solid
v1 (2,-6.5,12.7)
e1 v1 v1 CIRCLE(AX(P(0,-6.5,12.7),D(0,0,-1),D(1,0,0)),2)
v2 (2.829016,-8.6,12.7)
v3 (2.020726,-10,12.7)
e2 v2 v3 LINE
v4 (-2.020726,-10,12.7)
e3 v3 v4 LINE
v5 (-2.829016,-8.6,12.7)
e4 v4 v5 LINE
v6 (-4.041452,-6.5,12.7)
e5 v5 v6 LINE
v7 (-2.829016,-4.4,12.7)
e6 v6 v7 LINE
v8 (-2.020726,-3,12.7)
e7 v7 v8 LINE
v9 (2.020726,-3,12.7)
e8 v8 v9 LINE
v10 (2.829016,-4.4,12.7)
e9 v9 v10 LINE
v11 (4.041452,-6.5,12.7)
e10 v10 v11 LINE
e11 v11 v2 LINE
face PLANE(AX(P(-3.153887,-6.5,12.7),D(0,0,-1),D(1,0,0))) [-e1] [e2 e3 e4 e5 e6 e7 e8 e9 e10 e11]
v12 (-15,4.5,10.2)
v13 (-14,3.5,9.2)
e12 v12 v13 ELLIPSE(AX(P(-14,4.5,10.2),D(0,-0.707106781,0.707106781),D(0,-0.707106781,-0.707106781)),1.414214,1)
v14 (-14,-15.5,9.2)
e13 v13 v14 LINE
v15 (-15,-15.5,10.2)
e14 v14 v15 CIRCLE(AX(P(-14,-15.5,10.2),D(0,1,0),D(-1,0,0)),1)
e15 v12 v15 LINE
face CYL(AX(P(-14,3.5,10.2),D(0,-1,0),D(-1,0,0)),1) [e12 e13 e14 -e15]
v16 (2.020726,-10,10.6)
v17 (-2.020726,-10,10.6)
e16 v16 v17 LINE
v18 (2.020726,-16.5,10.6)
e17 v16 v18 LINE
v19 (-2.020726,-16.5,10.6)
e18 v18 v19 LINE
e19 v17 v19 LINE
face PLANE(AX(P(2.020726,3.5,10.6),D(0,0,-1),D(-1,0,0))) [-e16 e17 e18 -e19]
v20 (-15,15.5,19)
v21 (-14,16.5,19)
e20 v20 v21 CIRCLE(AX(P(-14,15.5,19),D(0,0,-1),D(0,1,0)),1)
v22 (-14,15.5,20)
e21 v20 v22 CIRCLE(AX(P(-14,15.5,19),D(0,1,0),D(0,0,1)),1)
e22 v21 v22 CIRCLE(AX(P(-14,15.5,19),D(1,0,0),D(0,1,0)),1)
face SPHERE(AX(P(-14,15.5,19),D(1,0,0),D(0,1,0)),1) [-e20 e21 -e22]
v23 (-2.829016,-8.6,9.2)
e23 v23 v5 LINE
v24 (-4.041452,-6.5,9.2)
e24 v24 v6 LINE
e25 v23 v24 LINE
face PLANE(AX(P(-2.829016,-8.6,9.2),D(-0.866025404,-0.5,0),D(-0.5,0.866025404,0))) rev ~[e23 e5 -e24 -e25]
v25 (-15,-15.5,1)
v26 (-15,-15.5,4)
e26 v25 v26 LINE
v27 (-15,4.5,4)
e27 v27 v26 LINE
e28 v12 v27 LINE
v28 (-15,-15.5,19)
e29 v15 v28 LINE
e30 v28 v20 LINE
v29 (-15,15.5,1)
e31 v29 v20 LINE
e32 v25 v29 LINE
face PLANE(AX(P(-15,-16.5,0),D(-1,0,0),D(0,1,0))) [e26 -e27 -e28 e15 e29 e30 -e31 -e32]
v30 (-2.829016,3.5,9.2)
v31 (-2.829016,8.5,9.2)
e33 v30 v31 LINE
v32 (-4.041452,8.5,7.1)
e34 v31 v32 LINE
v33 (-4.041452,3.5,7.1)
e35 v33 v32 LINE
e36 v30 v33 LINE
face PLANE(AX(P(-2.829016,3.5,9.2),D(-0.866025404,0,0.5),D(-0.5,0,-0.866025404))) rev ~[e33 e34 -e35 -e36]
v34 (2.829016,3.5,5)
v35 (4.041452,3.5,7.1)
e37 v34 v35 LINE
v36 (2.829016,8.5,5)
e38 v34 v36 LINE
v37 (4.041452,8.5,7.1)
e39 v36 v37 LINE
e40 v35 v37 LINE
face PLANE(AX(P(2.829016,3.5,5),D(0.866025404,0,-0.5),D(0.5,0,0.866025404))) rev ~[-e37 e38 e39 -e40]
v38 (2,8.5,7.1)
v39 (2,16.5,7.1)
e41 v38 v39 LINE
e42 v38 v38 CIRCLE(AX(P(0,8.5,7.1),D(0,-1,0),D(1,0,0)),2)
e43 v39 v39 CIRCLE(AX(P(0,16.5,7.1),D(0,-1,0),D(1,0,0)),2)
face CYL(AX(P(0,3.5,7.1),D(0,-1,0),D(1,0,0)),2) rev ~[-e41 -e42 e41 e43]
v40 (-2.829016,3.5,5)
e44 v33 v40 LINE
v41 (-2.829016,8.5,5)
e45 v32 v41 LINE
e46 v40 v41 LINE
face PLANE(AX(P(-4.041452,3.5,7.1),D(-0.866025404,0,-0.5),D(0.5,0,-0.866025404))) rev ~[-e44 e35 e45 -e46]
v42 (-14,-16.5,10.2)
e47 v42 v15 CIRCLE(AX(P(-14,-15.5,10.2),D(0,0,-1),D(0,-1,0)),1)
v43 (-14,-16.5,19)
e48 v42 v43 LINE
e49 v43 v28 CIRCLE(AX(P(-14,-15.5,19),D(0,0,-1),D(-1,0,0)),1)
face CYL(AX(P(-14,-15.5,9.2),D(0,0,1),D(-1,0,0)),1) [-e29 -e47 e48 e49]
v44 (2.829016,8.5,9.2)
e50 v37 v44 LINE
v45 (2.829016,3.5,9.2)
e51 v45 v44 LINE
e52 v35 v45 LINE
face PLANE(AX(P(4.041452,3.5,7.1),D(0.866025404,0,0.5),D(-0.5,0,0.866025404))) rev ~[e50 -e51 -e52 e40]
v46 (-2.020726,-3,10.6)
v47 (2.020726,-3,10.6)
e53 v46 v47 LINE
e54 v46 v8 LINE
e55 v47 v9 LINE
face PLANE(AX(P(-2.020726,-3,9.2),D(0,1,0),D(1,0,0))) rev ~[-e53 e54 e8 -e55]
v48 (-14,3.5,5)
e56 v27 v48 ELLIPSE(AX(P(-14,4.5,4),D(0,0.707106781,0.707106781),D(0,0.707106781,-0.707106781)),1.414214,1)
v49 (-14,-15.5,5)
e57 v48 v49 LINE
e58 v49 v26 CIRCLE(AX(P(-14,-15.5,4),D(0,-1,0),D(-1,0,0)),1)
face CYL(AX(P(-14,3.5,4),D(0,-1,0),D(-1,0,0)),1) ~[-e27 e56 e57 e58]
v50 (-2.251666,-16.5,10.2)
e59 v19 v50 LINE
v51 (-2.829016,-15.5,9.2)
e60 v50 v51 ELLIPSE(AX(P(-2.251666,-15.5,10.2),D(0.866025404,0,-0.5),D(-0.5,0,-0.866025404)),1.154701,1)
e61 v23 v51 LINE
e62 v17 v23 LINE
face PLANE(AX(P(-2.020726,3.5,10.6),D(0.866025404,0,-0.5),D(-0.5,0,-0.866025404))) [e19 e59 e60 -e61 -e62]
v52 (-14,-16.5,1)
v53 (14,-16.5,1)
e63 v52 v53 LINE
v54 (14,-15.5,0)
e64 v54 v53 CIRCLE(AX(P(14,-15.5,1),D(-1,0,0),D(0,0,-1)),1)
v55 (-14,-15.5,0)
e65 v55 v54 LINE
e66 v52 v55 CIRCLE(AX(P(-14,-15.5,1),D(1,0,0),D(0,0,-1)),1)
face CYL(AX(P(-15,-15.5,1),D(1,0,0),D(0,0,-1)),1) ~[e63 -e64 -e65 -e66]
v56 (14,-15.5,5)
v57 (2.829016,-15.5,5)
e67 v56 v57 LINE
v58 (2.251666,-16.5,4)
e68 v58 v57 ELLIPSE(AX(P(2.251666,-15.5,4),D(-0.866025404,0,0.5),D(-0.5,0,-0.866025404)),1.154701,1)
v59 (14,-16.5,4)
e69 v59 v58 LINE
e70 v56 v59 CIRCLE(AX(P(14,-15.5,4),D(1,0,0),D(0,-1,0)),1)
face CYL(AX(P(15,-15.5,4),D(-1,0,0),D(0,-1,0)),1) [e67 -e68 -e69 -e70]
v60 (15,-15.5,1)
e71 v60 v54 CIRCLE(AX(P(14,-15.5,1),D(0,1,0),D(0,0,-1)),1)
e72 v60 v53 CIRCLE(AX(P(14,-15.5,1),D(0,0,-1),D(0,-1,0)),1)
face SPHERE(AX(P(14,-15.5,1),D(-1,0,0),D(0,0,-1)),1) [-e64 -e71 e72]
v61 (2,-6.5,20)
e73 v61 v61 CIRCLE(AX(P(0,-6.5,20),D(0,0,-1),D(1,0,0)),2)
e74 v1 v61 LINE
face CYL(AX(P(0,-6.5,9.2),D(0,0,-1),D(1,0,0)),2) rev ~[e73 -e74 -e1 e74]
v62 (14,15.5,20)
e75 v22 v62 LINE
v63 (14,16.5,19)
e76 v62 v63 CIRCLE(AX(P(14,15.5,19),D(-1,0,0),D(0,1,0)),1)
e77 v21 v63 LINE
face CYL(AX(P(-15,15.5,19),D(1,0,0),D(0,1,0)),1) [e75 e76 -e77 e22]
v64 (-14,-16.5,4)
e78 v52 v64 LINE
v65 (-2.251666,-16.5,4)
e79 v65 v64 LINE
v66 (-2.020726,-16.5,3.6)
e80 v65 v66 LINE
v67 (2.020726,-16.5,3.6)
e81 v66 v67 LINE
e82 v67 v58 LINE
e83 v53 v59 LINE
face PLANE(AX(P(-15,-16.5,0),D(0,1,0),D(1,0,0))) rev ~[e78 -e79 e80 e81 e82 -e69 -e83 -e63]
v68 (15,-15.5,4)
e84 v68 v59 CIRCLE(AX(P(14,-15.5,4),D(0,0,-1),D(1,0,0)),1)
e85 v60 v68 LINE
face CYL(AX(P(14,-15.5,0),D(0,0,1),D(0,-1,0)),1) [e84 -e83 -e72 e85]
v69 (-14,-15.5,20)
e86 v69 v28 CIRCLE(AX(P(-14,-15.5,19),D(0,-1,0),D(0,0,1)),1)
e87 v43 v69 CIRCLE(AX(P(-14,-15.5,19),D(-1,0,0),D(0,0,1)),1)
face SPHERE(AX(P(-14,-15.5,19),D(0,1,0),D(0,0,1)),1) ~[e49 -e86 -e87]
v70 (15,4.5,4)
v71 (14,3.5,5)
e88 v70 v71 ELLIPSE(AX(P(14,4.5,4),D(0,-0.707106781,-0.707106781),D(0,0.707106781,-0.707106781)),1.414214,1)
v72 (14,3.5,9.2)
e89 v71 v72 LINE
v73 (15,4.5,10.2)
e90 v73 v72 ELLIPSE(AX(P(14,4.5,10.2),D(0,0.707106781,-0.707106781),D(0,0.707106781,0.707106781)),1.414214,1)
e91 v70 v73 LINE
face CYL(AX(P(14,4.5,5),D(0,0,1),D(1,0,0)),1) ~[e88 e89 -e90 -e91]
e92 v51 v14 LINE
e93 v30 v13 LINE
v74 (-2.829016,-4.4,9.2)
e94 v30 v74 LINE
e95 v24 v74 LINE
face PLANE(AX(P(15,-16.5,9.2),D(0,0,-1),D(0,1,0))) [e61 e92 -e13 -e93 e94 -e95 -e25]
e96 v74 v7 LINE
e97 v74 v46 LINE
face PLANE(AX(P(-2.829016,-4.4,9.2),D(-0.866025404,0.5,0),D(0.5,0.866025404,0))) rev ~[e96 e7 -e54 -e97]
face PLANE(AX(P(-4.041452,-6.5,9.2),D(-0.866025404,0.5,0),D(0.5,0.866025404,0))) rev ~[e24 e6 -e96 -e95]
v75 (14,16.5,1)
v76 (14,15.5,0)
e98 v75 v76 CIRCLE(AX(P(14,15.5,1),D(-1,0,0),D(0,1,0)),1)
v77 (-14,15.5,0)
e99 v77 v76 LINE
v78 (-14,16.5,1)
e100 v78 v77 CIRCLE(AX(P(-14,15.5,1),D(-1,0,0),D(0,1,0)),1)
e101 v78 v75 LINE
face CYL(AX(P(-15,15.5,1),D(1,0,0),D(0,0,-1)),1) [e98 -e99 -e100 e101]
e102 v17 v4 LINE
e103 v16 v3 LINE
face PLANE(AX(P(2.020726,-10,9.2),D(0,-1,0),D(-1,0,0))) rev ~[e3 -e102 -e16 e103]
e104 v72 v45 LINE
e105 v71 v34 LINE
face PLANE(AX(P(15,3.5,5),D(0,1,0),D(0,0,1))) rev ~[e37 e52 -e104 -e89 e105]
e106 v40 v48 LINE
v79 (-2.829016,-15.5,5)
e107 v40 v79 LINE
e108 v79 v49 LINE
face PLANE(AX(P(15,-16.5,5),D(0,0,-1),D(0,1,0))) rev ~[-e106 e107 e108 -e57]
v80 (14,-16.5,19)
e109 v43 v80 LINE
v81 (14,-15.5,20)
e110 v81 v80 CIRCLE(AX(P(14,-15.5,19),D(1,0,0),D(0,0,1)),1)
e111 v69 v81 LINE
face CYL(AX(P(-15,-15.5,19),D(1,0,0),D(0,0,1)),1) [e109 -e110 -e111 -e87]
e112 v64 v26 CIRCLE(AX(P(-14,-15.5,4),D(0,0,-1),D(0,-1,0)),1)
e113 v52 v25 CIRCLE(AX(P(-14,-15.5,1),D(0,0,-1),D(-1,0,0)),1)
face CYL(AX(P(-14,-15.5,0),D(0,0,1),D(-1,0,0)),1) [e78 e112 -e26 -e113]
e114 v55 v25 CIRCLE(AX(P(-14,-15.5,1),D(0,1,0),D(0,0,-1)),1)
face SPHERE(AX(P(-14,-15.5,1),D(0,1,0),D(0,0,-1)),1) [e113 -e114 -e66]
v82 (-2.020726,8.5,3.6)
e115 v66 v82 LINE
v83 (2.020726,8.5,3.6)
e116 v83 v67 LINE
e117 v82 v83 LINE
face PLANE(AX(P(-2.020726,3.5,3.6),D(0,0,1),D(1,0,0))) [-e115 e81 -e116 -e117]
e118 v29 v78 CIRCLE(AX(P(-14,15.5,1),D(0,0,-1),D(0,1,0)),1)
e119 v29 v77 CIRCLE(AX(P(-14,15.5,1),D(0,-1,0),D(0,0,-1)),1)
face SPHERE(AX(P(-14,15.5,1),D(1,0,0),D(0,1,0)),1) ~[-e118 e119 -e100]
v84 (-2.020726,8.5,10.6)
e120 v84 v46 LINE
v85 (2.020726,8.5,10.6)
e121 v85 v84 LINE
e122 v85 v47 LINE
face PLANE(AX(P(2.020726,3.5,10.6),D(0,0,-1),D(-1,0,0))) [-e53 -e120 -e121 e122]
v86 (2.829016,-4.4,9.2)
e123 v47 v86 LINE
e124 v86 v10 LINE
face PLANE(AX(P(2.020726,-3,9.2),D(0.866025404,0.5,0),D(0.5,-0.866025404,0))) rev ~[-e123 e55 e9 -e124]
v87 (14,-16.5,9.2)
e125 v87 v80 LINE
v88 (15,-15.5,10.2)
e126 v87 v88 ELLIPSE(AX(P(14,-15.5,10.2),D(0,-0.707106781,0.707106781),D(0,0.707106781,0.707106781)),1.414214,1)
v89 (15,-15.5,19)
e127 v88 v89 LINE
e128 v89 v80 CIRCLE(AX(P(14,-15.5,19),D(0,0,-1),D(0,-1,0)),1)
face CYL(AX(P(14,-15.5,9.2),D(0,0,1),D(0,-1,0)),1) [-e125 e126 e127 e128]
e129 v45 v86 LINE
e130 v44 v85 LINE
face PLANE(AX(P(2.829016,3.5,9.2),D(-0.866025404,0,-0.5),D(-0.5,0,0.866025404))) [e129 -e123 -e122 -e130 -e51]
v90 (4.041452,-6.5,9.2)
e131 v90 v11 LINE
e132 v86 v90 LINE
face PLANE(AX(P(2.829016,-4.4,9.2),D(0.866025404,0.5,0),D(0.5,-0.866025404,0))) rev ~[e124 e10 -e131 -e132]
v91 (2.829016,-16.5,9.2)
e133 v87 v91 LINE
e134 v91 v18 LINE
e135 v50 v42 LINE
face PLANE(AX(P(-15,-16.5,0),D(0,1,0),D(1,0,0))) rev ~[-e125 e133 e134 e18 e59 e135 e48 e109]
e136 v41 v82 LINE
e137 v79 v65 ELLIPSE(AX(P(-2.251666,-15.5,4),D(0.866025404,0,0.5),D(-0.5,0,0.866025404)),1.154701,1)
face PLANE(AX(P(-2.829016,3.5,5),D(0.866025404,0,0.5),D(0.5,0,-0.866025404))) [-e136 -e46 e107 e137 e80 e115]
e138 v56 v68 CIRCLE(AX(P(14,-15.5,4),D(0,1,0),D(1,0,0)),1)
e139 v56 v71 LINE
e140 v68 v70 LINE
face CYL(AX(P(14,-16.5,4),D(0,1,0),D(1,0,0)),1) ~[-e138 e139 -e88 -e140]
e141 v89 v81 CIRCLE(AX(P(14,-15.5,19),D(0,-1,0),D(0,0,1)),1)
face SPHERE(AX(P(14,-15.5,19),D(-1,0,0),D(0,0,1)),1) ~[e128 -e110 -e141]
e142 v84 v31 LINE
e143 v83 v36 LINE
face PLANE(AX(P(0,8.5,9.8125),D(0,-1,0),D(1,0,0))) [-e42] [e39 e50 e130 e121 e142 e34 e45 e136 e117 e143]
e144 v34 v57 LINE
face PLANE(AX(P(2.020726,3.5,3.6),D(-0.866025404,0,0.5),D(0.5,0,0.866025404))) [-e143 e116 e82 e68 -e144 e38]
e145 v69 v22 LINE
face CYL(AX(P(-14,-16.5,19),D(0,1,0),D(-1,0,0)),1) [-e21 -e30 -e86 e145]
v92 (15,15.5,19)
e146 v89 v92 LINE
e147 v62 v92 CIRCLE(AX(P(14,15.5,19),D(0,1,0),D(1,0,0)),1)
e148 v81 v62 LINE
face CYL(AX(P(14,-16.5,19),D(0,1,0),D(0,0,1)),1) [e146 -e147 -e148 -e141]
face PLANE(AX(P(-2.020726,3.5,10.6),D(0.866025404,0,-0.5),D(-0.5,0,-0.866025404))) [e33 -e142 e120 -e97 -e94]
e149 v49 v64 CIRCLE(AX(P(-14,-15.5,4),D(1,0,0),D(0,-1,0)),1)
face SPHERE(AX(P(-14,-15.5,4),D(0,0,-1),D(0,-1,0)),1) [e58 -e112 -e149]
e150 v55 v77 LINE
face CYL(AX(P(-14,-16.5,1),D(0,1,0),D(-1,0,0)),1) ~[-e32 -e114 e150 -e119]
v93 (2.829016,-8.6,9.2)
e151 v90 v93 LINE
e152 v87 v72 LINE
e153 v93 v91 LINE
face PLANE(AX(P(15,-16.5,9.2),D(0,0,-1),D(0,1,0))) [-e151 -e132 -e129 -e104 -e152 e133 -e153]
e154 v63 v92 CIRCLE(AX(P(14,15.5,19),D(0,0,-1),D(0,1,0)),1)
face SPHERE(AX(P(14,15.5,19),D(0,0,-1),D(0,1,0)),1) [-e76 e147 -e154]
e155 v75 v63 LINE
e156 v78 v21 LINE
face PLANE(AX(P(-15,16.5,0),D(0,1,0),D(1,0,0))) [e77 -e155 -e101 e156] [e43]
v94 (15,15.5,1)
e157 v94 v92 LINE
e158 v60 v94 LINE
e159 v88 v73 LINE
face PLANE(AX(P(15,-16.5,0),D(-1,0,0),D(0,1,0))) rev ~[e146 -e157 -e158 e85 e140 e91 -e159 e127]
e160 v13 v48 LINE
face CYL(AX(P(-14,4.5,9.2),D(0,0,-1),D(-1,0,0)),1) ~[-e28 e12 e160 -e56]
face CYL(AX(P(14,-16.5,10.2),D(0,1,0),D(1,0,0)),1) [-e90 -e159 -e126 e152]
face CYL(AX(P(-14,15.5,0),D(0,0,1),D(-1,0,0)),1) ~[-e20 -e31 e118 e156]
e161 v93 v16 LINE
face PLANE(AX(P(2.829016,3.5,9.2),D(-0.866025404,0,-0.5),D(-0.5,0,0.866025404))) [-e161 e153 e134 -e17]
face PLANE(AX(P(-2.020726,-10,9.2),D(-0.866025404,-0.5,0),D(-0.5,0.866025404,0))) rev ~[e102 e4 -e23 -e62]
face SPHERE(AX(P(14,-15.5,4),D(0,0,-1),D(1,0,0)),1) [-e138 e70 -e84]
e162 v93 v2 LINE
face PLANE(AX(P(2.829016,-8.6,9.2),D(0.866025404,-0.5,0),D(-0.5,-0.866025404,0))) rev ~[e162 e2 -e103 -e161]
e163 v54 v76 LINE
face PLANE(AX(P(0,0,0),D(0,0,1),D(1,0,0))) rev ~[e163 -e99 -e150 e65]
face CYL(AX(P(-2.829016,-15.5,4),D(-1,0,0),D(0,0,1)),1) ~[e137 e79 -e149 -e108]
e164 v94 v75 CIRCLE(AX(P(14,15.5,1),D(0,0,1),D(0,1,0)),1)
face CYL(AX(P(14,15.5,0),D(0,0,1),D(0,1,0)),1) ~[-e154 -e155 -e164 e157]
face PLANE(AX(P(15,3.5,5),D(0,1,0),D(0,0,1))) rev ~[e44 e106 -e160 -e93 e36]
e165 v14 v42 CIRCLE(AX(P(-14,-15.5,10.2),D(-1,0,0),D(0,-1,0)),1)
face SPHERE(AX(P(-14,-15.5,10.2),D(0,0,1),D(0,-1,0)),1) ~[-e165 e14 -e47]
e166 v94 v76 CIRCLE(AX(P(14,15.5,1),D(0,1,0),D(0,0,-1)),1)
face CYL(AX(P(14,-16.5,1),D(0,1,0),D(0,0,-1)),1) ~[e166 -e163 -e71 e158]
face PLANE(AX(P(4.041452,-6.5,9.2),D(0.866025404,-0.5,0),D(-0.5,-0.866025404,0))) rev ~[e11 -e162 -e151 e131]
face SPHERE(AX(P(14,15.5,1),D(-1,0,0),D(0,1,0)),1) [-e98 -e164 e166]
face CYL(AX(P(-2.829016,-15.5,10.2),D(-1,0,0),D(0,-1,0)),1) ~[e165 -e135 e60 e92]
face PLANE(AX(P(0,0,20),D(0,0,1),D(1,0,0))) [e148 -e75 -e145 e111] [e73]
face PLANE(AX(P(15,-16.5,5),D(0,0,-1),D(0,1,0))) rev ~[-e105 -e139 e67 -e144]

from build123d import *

# Parameters (mm, degrees)
F0_W          = 30
F0_H          = 33
F1_DEPTH      = 20
F2_W          = 20
F2_H          = 4.2
F3_DEPTH      = 30.001
F4_R          = 2
F5_DEPTH      = 5
F5_DEPTH_BACK = 20.001
F6_DEPTH      = 13.001
F7_R          = 2
F8_DEPTH      = 10.801
F9_DEPTH      = 3.5
F10_R         = 1


with BuildPart() as f1:
    # F0 (on Top) → F1 (new body)
    with BuildSketch(Plane.XY):
        Rectangle(F0_W, F0_H)
    extrude(amount=F1_DEPTH)

    # F2 (on face) → F3 (cut, through all)
    with BuildSketch(Plane.YZ.offset(15)):
        with Locations((-6.5, 7.1)):
            Rectangle(F2_W, F2_H)
    extrude(amount=-F3_DEPTH, mode=Mode.SUBTRACT)

    # F4 (on face) → F5 (cut, two sides)
    with BuildSketch(Plane.XZ.offset(-3.5)) as f5_sk:
        Polygon((-2.829016319, 9.2), (2.829016319, 9.2), (2.0207259422, 10.6), (-2.0207259422, 10.6), align=None)
        Polygon((-2.829016319, 5), (2.829016319, 5), (4.0414518843, 7.1), (2.829016319, 9.2), (-2.829016319, 9.2), (-4.0414518843, 7.1), align=None)
        with Locations((0, 7.1)):
            Circle(F4_R, mode=Mode.SUBTRACT)
        Polygon((-2.0207259422, 3.6), (2.0207259422, 3.6), (2.829016319, 5), (-2.829016319, 5), align=None)
    extrude(amount=-F5_DEPTH, mode=Mode.SUBTRACT)
    extrude(f5_sk.sketch, amount=F5_DEPTH_BACK, mode=Mode.SUBTRACT)

    # F6 (cut, through all): a face of the model
    f6_faces = [f1.faces().sort_by_distance(p)[0] for p in [
        (0, 3.5, 7.1),
    ]]
    extrude(f6_faces, amount=-F6_DEPTH, mode=Mode.SUBTRACT)

    # F7 (on face) → F8 (cut, through all)
    with BuildSketch(Plane(origin=(0, 0, 9.2), x_dir=(1, 0, 0), z_dir=(0, 0, -1))):
        with Locations((0, 6.5)):
            Circle(F7_R)
    extrude(amount=-F8_DEPTH, mode=Mode.SUBTRACT)

    # F7 (on face) → F9 (cut)
    with BuildSketch(Plane(origin=(0, 0, 9.2), x_dir=(1, 0, 0), z_dir=(0, 0, -1))):
        Polygon((-4.0414518843, 6.5), (-2.829016319, 4.4), (-2.829016319, 8.6), align=None)
        Polygon((-2.829016319, 8.6), (-2.829016319, 4.4), (-2.0207259422, 3), (2.0207259422, 3), (2.829016319, 4.4), (2.829016319, 8.6), (2.0207259422, 10), (-2.0207259422, 10), align=None)
        with Locations((0, 6.5)):
            Circle(F7_R, mode=Mode.SUBTRACT)
        Polygon((2.829016319, 8.6), (2.829016319, 4.4), (4.0414518843, 6.5), align=None)
    extrude(amount=-F9_DEPTH, mode=Mode.SUBTRACT)

    # F10
    f10_edges = [f1.edges().sort_by_distance(p)[0] for p in [
        (0, 16.5, 0),
        (15, 16.5, 10),
        (0, 16.5, 20),
        (-15, 16.5, 10),
        (-15, 0, 0),
        (0, -16.5, 0),
        (15, 0, 0),
        (-15, 0, 20),
        (0, -16.5, 20),
        (15, 0, 20),
        (-15, -16.5, 2.5),
        (-15, -16.5, 14.6),
        (15, -16.5, 2.5),
        (15, -16.5, 14.6),
        (15, -6.5, 9.2),
        (15, -6.5, 5),
        (8.914508, -16.5, 5),
        (-8.914508, -16.5, 5),
        (-8.914508, -16.5, 9.2),
        (-15, 3.5, 7.1),
        (-15, -6.5, 5),
        (-15, -6.5, 9.2),
        (15, 3.5, 7.1),
    ]]
    fillet(f10_edges, radius=F10_R)


solid = f1.part
